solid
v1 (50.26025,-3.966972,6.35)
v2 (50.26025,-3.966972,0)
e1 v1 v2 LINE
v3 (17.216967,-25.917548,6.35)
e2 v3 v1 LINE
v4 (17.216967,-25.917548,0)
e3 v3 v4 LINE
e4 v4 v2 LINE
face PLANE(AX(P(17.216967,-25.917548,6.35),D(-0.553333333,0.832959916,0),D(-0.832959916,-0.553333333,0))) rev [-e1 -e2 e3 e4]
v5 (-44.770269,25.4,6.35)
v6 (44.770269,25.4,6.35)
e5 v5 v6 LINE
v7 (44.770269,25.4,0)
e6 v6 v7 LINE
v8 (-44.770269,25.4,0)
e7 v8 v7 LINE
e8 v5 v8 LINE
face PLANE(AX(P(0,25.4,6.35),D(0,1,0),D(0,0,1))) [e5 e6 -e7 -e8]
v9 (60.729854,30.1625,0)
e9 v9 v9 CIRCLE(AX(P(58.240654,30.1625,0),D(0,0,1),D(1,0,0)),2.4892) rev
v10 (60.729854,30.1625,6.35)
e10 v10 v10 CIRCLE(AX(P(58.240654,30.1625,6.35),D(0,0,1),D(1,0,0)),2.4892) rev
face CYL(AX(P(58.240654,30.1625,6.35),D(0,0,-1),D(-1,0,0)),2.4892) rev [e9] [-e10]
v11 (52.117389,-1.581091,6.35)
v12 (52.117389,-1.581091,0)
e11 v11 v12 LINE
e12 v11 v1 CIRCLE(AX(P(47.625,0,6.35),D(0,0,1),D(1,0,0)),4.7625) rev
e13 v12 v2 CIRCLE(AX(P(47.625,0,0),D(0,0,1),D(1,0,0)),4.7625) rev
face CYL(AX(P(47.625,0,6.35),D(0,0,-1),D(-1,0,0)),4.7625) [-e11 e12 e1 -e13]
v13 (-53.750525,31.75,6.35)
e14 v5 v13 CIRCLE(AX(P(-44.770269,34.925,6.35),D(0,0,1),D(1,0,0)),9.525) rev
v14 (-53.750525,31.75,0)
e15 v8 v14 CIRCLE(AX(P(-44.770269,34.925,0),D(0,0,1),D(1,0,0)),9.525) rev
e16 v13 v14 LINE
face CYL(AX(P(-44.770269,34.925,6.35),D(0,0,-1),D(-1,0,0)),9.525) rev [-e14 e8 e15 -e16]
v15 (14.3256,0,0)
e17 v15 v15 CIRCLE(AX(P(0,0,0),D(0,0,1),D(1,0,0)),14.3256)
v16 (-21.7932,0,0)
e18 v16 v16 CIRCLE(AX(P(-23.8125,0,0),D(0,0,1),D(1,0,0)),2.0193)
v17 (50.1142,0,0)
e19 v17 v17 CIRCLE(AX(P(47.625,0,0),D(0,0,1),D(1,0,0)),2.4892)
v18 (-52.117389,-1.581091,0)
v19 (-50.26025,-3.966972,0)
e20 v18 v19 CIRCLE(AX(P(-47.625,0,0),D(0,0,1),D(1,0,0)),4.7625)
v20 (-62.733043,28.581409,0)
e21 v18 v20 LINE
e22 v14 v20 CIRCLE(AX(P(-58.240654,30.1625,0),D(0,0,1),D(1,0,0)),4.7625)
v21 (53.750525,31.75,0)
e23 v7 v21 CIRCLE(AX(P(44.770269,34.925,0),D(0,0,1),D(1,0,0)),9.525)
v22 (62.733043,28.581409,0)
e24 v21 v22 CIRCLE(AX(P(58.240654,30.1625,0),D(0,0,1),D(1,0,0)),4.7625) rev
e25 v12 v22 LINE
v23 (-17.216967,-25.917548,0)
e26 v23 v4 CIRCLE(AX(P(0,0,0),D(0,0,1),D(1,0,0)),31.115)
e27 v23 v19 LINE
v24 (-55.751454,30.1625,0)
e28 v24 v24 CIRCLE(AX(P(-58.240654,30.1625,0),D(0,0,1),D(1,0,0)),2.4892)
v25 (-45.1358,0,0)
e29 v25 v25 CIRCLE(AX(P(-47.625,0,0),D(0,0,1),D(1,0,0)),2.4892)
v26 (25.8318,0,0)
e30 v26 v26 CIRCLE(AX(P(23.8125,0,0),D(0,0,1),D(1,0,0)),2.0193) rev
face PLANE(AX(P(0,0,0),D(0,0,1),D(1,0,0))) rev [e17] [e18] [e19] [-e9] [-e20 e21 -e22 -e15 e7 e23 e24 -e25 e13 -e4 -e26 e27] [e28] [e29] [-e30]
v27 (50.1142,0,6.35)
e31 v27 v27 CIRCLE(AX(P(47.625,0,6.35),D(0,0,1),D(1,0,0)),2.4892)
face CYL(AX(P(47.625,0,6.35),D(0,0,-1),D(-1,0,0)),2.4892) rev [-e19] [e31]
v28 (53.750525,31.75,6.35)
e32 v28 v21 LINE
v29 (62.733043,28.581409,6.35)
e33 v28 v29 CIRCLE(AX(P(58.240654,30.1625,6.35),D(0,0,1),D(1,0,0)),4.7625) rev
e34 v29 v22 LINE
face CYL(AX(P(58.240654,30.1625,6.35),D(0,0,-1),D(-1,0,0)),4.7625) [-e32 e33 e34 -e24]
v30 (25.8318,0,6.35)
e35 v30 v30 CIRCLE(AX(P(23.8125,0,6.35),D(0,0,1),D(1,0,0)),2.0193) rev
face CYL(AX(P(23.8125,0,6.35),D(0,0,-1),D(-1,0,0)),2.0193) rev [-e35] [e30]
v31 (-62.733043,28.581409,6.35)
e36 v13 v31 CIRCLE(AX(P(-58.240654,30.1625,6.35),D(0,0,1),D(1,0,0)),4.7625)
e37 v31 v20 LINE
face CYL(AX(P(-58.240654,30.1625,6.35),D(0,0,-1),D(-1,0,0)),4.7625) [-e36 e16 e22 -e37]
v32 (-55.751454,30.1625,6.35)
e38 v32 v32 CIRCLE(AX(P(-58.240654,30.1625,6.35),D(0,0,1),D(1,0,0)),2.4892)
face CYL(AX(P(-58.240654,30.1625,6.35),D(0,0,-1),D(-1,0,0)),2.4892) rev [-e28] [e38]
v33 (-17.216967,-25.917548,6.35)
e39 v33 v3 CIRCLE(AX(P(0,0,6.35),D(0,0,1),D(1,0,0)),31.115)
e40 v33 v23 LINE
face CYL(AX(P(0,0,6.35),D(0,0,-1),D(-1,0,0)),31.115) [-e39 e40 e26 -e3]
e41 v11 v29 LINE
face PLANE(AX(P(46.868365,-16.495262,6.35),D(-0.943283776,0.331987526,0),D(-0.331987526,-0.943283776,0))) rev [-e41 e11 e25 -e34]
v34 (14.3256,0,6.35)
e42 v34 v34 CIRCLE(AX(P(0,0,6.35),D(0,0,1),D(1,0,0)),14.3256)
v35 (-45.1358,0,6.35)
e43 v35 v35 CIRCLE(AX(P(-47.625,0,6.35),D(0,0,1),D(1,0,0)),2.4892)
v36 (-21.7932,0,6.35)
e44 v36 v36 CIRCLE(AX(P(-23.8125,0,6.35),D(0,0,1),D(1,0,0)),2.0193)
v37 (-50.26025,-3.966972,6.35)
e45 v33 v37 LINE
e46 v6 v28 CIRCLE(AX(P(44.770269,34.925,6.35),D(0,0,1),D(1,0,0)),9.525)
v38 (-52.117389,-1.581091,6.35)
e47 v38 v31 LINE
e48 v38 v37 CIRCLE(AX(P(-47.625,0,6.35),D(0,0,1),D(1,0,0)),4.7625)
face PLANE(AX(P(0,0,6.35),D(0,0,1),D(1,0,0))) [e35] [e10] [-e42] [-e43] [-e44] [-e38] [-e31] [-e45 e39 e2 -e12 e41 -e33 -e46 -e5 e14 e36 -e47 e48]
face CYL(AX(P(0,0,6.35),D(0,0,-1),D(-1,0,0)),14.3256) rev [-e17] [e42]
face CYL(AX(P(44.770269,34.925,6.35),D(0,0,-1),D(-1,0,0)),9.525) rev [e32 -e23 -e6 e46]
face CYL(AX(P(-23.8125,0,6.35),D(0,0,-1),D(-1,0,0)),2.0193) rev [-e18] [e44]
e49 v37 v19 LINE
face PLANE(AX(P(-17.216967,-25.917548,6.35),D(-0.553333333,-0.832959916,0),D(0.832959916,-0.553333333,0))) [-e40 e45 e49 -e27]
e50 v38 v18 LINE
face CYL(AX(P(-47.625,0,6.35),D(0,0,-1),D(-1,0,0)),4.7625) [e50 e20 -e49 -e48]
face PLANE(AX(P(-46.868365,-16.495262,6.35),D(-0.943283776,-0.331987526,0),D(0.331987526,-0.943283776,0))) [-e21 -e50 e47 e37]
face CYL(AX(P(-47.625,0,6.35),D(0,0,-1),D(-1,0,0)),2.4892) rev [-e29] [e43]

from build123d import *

# Parameters (mm, degrees)
CROQUIS2_R                    = 2.0193
CROQUIS2_R_2                  = 14.3256
CROQUIS2_R_3                  = 2.4892
SALIENTE_EXTRUIR1_DEPTH       = 6.35
CROQUIS4_R                    = 11.1125
CROQUIS4_R_2                  = 2.0193
CROQUIS4_R_3                  = 14.3256
CROQUIS4_R_4                  = 2.4892
CROQUIS4_R_5                  = 12.7
SALIENTE_EXTRUIR2_DEPTH       = 6.35
SALIENTE_EXTRUIR3_OUTLINE_R   = 2.4892
SALIENTE_EXTRUIR3_OUTLINE_R_2 = 11.1125
SALIENTE_EXTRUIR3_DEPTH       = 3.175


# Read off the part's stored shape, not the designer's step: Saliente-Extruir3
with BuildPart() as part:
    # Croquis2 → Saliente-Extruir1 (new body)
    with BuildSketch(Plane.XY):
        with BuildLine():
            Line((-50.26025, -3.966971602), (-17.216966667, -25.917547797))
            ThreePointArc((-17.216966667, -25.917547797), (0, -31.115), (17.216966667, -25.917547797))
            Line((17.216966667, -25.917547797), (50.26025, -3.966971602))
            ThreePointArc((50.26025, -3.966971602), (51.383179934, -2.925318757), (52.117388984, -1.581090594))
            Line((52.117388984, -1.581090594), (62.733042527, 28.581409406))
            ThreePointArc((62.733042527, 28.581409406), (59.824949243, 34.653759666), (53.750525482, 31.75))
            ThreePointArc((53.750525482, 31.75), (50.269530675, 27.147870067), (44.770269361, 25.4))
            Line((44.770269361, 25.4), (-44.770269361, 25.4))
            ThreePointArc((-44.770269361, 25.4), (-50.269530675, 27.147870067), (-53.750525482, 31.75))
            ThreePointArc((-53.750525482, 31.75), (-59.824949243, 34.653759666), (-62.733042527, 28.581409406))
            Line((-62.733042527, 28.581409406), (-52.117388984, -1.581090594))
            ThreePointArc((-52.117388984, -1.581090594), (-51.383179934, -2.925318757), (-50.26025, -3.966971602))
        make_face()
        with Locations((23.8125, 0)):
            Circle(CROQUIS2_R, mode=Mode.SUBTRACT)
        with Locations((-23.8125, 0)):
            Circle(CROQUIS2_R, mode=Mode.SUBTRACT)
        Circle(CROQUIS2_R_2, mode=Mode.SUBTRACT)
        with Locations((-47.625, 0)):
            Circle(CROQUIS2_R_3, mode=Mode.SUBTRACT)
        with Locations((47.625, 0)):
            Circle(CROQUIS2_R_3, mode=Mode.SUBTRACT)
        with Locations((-58.240653543, 30.1625)):
            Circle(CROQUIS2_R_3, mode=Mode.SUBTRACT)
        with Locations((58.240653543, 30.1625)):
            Circle(CROQUIS2_R_3, mode=Mode.SUBTRACT)
    extrude(amount=SALIENTE_EXTRUIR1_DEPTH)


with BuildPart() as body_2:
    # Croquis4 → Saliente-Extruir2 (new body)
    with BuildSketch(Plane.XY):
        with BuildLine():
            Line((-63.003153543, 56.9875), (-63.003153543, 30.1625))
            ThreePointArc((-63.003153543, 30.1625), (-62.935140138, 29.360501336), (-62.733042527, 28.581409406))
            Line((-62.733042527, 28.581409406), (-52.117388984, -1.581090594))
            ThreePointArc((-52.117388984, -1.581090594), (-51.383179934, -2.925318757), (-50.26025, -3.966971602))
            Line((-50.26025, -3.966971602), (-17.216966667, -25.917547797))
            ThreePointArc((-17.216966667, -25.917547797), (0, -31.115), (17.216966667, -25.917547797))
            Line((17.216966667, -25.917547797), (50.26025, -3.966971602))
            ThreePointArc((50.26025, -3.966971602), (51.383179934, -2.925318757), (52.117388984, -1.581090594))
            Line((52.117388984, -1.581090594), (62.733042527, 28.581409406))
            ThreePointArc((62.733042527, 28.581409406), (62.935140138, 29.360501336), (63.003153543, 30.1625))
            Line((63.003153543, 30.1625), (63.003153543, 56.9875))
            ThreePointArc((63.003153543, 56.9875), (54.216356978, 78.200703436), (33.003153543, 86.9875))
            Line((33.003153543, 86.9875), (-33.003153543, 86.9875))
            ThreePointArc((-33.003153543, 86.9875), (-54.216356978, 78.200703436), (-63.003153543, 56.9875))
        make_face()
        with Locations((0, 40.64)):
            Circle(CROQUIS4_R, mode=Mode.SUBTRACT)
        with Locations((-16.145831218, -9.3218)):
            Circle(CROQUIS4_R_2, mode=Mode.SUBTRACT)
        Circle(CROQUIS4_R_3, mode=Mode.SUBTRACT)
        with Locations((0, 18.6436)):
            Circle(CROQUIS4_R_2, mode=Mode.SUBTRACT)
        with Locations((16.145831218, -9.3218)):
            Circle(CROQUIS4_R_2, mode=Mode.SUBTRACT)
        with Locations((-47.625, 0)):
            Circle(CROQUIS4_R_4, mode=Mode.SUBTRACT)
        with Locations((47.625, 0)):
            Circle(CROQUIS4_R_4, mode=Mode.SUBTRACT)
        with Locations((-29.02971813, 82.074783851)):
            Circle(CROQUIS4_R_4, mode=Mode.SUBTRACT)
        with Locations((-36.976588955, 31.900216149)):
            Circle(CROQUIS4_R_4, mode=Mode.SUBTRACT)
        with Locations((-33.003153543, 56.9875)):
            Circle(CROQUIS4_R_5, mode=Mode.SUBTRACT)
        with Locations((-58.090437394, 60.960935412)):
            Circle(CROQUIS4_R_4, mode=Mode.SUBTRACT)
        with Locations((-58.240653543, 30.1625)):
            Circle(CROQUIS4_R_4, mode=Mode.SUBTRACT)
        with Locations((58.090437394, 60.960935412)):
            Circle(CROQUIS4_R_4, mode=Mode.SUBTRACT)
        with Locations((36.976588955, 31.900216149)):
            Circle(CROQUIS4_R_4, mode=Mode.SUBTRACT)
        with Locations((33.003153543, 56.9875)):
            Circle(CROQUIS4_R_5, mode=Mode.SUBTRACT)
        with Locations((29.02971813, 82.074783851)):
            Circle(CROQUIS4_R_4, mode=Mode.SUBTRACT)
        with Locations((58.240653543, 30.1625)):
            Circle(CROQUIS4_R_4, mode=Mode.SUBTRACT)
    extrude(amount=-SALIENTE_EXTRUIR2_DEPTH)


with BuildPart() as body_3:
    # Saliente-Extruir3 outline → Saliente-Extruir3 (new body)
    with BuildSketch(Plane.XY):
        with BuildLine():
            Line((-35.881109014, 27.265420582), (-22.987624276, 30.312923688))
            ThreePointArc((-22.987624276, 30.312923688), (-18.059295743, 30.166513899), (-13.86444293, 27.575555036))
            ThreePointArc((-13.86444293, 27.575555036), (0, 21.59), (13.86444293, 27.575555036))
            ThreePointArc((13.86444293, 27.575555036), (18.059295743, 30.166513899), (22.987624276, 30.312923688))
            Line((22.987624276, 30.312923688), (35.881109014, 27.265420582))
            ThreePointArc((35.881109014, 27.265420582), (41.611384522, 30.804736208), (38.072068895, 36.535011716))
            Line((38.072068895, 36.535011716), (23.323178626, 40.021058337))
            ThreePointArc((23.323178626, 40.021058337), (20.26820543, 41.736288231), (18.58786391, 44.81058932))
            ThreePointArc((18.58786391, 44.81058932), (18.032030897, 46.783969542), (17.267348762, 48.686189579))
            ThreePointArc((17.267348762, 48.686189579), (16.412494406, 53.542019269), (18.100083663, 58.174718315))
            Line((18.100083663, 58.174718315), (32.93018787, 79.342066878))
            ThreePointArc((32.93018787, 79.342066878), (31.762435104, 85.975253591), (25.129248391, 84.807500825))
            Line((25.129248391, 84.807500825), (11.314654439, 65.08961339))
            ThreePointArc((11.314654439, 65.08961339), (6.613405383, 61.027851685), (0.54804108, 59.682115192))
            ThreePointArc((0.54804108, 59.682115192), (0, 59.69), (-0.54804108, 59.682115192))
            ThreePointArc((-0.54804108, 59.682115192), (-6.613405383, 61.027851685), (-11.314654439, 65.08961339))
            Line((-11.314654439, 65.08961339), (-25.129248391, 84.807500825))
            ThreePointArc((-25.129248391, 84.807500825), (-31.762435104, 85.975253591), (-32.93018787, 79.342066878))
            Line((-32.93018787, 79.342066878), (-18.100083663, 58.174718315))
            ThreePointArc((-18.100083663, 58.174718315), (-16.412494406, 53.542019269), (-17.267348762, 48.686189579))
            ThreePointArc((-17.267348762, 48.686189579), (-18.032030897, 46.783969542), (-18.58786391, 44.81058932))
            ThreePointArc((-18.58786391, 44.81058932), (-20.26820543, 41.736288231), (-23.323178626, 40.021058337))
            Line((-23.323178626, 40.021058337), (-38.072068895, 36.535011716))
            ThreePointArc((-38.072068895, 36.535011716), (-41.611384522, 30.804736208), (-35.881109014, 27.265420582))
        make_face()
        with Locations((-36.976588955, 31.900216149)):
            Circle(SALIENTE_EXTRUIR3_OUTLINE_R, mode=Mode.SUBTRACT)
        with Locations((36.976588955, 31.900216149)):
            Circle(SALIENTE_EXTRUIR3_OUTLINE_R, mode=Mode.SUBTRACT)
        with Locations((0, 40.64)):
            Circle(SALIENTE_EXTRUIR3_OUTLINE_R_2, mode=Mode.SUBTRACT)
        with Locations((-29.02971813, 82.074783851)):
            Circle(SALIENTE_EXTRUIR3_OUTLINE_R, mode=Mode.SUBTRACT)
        with Locations((29.02971813, 82.074783851)):
            Circle(SALIENTE_EXTRUIR3_OUTLINE_R, mode=Mode.SUBTRACT)
    extrude(amount=SALIENTE_EXTRUIR3_DEPTH)


solid = part.part
